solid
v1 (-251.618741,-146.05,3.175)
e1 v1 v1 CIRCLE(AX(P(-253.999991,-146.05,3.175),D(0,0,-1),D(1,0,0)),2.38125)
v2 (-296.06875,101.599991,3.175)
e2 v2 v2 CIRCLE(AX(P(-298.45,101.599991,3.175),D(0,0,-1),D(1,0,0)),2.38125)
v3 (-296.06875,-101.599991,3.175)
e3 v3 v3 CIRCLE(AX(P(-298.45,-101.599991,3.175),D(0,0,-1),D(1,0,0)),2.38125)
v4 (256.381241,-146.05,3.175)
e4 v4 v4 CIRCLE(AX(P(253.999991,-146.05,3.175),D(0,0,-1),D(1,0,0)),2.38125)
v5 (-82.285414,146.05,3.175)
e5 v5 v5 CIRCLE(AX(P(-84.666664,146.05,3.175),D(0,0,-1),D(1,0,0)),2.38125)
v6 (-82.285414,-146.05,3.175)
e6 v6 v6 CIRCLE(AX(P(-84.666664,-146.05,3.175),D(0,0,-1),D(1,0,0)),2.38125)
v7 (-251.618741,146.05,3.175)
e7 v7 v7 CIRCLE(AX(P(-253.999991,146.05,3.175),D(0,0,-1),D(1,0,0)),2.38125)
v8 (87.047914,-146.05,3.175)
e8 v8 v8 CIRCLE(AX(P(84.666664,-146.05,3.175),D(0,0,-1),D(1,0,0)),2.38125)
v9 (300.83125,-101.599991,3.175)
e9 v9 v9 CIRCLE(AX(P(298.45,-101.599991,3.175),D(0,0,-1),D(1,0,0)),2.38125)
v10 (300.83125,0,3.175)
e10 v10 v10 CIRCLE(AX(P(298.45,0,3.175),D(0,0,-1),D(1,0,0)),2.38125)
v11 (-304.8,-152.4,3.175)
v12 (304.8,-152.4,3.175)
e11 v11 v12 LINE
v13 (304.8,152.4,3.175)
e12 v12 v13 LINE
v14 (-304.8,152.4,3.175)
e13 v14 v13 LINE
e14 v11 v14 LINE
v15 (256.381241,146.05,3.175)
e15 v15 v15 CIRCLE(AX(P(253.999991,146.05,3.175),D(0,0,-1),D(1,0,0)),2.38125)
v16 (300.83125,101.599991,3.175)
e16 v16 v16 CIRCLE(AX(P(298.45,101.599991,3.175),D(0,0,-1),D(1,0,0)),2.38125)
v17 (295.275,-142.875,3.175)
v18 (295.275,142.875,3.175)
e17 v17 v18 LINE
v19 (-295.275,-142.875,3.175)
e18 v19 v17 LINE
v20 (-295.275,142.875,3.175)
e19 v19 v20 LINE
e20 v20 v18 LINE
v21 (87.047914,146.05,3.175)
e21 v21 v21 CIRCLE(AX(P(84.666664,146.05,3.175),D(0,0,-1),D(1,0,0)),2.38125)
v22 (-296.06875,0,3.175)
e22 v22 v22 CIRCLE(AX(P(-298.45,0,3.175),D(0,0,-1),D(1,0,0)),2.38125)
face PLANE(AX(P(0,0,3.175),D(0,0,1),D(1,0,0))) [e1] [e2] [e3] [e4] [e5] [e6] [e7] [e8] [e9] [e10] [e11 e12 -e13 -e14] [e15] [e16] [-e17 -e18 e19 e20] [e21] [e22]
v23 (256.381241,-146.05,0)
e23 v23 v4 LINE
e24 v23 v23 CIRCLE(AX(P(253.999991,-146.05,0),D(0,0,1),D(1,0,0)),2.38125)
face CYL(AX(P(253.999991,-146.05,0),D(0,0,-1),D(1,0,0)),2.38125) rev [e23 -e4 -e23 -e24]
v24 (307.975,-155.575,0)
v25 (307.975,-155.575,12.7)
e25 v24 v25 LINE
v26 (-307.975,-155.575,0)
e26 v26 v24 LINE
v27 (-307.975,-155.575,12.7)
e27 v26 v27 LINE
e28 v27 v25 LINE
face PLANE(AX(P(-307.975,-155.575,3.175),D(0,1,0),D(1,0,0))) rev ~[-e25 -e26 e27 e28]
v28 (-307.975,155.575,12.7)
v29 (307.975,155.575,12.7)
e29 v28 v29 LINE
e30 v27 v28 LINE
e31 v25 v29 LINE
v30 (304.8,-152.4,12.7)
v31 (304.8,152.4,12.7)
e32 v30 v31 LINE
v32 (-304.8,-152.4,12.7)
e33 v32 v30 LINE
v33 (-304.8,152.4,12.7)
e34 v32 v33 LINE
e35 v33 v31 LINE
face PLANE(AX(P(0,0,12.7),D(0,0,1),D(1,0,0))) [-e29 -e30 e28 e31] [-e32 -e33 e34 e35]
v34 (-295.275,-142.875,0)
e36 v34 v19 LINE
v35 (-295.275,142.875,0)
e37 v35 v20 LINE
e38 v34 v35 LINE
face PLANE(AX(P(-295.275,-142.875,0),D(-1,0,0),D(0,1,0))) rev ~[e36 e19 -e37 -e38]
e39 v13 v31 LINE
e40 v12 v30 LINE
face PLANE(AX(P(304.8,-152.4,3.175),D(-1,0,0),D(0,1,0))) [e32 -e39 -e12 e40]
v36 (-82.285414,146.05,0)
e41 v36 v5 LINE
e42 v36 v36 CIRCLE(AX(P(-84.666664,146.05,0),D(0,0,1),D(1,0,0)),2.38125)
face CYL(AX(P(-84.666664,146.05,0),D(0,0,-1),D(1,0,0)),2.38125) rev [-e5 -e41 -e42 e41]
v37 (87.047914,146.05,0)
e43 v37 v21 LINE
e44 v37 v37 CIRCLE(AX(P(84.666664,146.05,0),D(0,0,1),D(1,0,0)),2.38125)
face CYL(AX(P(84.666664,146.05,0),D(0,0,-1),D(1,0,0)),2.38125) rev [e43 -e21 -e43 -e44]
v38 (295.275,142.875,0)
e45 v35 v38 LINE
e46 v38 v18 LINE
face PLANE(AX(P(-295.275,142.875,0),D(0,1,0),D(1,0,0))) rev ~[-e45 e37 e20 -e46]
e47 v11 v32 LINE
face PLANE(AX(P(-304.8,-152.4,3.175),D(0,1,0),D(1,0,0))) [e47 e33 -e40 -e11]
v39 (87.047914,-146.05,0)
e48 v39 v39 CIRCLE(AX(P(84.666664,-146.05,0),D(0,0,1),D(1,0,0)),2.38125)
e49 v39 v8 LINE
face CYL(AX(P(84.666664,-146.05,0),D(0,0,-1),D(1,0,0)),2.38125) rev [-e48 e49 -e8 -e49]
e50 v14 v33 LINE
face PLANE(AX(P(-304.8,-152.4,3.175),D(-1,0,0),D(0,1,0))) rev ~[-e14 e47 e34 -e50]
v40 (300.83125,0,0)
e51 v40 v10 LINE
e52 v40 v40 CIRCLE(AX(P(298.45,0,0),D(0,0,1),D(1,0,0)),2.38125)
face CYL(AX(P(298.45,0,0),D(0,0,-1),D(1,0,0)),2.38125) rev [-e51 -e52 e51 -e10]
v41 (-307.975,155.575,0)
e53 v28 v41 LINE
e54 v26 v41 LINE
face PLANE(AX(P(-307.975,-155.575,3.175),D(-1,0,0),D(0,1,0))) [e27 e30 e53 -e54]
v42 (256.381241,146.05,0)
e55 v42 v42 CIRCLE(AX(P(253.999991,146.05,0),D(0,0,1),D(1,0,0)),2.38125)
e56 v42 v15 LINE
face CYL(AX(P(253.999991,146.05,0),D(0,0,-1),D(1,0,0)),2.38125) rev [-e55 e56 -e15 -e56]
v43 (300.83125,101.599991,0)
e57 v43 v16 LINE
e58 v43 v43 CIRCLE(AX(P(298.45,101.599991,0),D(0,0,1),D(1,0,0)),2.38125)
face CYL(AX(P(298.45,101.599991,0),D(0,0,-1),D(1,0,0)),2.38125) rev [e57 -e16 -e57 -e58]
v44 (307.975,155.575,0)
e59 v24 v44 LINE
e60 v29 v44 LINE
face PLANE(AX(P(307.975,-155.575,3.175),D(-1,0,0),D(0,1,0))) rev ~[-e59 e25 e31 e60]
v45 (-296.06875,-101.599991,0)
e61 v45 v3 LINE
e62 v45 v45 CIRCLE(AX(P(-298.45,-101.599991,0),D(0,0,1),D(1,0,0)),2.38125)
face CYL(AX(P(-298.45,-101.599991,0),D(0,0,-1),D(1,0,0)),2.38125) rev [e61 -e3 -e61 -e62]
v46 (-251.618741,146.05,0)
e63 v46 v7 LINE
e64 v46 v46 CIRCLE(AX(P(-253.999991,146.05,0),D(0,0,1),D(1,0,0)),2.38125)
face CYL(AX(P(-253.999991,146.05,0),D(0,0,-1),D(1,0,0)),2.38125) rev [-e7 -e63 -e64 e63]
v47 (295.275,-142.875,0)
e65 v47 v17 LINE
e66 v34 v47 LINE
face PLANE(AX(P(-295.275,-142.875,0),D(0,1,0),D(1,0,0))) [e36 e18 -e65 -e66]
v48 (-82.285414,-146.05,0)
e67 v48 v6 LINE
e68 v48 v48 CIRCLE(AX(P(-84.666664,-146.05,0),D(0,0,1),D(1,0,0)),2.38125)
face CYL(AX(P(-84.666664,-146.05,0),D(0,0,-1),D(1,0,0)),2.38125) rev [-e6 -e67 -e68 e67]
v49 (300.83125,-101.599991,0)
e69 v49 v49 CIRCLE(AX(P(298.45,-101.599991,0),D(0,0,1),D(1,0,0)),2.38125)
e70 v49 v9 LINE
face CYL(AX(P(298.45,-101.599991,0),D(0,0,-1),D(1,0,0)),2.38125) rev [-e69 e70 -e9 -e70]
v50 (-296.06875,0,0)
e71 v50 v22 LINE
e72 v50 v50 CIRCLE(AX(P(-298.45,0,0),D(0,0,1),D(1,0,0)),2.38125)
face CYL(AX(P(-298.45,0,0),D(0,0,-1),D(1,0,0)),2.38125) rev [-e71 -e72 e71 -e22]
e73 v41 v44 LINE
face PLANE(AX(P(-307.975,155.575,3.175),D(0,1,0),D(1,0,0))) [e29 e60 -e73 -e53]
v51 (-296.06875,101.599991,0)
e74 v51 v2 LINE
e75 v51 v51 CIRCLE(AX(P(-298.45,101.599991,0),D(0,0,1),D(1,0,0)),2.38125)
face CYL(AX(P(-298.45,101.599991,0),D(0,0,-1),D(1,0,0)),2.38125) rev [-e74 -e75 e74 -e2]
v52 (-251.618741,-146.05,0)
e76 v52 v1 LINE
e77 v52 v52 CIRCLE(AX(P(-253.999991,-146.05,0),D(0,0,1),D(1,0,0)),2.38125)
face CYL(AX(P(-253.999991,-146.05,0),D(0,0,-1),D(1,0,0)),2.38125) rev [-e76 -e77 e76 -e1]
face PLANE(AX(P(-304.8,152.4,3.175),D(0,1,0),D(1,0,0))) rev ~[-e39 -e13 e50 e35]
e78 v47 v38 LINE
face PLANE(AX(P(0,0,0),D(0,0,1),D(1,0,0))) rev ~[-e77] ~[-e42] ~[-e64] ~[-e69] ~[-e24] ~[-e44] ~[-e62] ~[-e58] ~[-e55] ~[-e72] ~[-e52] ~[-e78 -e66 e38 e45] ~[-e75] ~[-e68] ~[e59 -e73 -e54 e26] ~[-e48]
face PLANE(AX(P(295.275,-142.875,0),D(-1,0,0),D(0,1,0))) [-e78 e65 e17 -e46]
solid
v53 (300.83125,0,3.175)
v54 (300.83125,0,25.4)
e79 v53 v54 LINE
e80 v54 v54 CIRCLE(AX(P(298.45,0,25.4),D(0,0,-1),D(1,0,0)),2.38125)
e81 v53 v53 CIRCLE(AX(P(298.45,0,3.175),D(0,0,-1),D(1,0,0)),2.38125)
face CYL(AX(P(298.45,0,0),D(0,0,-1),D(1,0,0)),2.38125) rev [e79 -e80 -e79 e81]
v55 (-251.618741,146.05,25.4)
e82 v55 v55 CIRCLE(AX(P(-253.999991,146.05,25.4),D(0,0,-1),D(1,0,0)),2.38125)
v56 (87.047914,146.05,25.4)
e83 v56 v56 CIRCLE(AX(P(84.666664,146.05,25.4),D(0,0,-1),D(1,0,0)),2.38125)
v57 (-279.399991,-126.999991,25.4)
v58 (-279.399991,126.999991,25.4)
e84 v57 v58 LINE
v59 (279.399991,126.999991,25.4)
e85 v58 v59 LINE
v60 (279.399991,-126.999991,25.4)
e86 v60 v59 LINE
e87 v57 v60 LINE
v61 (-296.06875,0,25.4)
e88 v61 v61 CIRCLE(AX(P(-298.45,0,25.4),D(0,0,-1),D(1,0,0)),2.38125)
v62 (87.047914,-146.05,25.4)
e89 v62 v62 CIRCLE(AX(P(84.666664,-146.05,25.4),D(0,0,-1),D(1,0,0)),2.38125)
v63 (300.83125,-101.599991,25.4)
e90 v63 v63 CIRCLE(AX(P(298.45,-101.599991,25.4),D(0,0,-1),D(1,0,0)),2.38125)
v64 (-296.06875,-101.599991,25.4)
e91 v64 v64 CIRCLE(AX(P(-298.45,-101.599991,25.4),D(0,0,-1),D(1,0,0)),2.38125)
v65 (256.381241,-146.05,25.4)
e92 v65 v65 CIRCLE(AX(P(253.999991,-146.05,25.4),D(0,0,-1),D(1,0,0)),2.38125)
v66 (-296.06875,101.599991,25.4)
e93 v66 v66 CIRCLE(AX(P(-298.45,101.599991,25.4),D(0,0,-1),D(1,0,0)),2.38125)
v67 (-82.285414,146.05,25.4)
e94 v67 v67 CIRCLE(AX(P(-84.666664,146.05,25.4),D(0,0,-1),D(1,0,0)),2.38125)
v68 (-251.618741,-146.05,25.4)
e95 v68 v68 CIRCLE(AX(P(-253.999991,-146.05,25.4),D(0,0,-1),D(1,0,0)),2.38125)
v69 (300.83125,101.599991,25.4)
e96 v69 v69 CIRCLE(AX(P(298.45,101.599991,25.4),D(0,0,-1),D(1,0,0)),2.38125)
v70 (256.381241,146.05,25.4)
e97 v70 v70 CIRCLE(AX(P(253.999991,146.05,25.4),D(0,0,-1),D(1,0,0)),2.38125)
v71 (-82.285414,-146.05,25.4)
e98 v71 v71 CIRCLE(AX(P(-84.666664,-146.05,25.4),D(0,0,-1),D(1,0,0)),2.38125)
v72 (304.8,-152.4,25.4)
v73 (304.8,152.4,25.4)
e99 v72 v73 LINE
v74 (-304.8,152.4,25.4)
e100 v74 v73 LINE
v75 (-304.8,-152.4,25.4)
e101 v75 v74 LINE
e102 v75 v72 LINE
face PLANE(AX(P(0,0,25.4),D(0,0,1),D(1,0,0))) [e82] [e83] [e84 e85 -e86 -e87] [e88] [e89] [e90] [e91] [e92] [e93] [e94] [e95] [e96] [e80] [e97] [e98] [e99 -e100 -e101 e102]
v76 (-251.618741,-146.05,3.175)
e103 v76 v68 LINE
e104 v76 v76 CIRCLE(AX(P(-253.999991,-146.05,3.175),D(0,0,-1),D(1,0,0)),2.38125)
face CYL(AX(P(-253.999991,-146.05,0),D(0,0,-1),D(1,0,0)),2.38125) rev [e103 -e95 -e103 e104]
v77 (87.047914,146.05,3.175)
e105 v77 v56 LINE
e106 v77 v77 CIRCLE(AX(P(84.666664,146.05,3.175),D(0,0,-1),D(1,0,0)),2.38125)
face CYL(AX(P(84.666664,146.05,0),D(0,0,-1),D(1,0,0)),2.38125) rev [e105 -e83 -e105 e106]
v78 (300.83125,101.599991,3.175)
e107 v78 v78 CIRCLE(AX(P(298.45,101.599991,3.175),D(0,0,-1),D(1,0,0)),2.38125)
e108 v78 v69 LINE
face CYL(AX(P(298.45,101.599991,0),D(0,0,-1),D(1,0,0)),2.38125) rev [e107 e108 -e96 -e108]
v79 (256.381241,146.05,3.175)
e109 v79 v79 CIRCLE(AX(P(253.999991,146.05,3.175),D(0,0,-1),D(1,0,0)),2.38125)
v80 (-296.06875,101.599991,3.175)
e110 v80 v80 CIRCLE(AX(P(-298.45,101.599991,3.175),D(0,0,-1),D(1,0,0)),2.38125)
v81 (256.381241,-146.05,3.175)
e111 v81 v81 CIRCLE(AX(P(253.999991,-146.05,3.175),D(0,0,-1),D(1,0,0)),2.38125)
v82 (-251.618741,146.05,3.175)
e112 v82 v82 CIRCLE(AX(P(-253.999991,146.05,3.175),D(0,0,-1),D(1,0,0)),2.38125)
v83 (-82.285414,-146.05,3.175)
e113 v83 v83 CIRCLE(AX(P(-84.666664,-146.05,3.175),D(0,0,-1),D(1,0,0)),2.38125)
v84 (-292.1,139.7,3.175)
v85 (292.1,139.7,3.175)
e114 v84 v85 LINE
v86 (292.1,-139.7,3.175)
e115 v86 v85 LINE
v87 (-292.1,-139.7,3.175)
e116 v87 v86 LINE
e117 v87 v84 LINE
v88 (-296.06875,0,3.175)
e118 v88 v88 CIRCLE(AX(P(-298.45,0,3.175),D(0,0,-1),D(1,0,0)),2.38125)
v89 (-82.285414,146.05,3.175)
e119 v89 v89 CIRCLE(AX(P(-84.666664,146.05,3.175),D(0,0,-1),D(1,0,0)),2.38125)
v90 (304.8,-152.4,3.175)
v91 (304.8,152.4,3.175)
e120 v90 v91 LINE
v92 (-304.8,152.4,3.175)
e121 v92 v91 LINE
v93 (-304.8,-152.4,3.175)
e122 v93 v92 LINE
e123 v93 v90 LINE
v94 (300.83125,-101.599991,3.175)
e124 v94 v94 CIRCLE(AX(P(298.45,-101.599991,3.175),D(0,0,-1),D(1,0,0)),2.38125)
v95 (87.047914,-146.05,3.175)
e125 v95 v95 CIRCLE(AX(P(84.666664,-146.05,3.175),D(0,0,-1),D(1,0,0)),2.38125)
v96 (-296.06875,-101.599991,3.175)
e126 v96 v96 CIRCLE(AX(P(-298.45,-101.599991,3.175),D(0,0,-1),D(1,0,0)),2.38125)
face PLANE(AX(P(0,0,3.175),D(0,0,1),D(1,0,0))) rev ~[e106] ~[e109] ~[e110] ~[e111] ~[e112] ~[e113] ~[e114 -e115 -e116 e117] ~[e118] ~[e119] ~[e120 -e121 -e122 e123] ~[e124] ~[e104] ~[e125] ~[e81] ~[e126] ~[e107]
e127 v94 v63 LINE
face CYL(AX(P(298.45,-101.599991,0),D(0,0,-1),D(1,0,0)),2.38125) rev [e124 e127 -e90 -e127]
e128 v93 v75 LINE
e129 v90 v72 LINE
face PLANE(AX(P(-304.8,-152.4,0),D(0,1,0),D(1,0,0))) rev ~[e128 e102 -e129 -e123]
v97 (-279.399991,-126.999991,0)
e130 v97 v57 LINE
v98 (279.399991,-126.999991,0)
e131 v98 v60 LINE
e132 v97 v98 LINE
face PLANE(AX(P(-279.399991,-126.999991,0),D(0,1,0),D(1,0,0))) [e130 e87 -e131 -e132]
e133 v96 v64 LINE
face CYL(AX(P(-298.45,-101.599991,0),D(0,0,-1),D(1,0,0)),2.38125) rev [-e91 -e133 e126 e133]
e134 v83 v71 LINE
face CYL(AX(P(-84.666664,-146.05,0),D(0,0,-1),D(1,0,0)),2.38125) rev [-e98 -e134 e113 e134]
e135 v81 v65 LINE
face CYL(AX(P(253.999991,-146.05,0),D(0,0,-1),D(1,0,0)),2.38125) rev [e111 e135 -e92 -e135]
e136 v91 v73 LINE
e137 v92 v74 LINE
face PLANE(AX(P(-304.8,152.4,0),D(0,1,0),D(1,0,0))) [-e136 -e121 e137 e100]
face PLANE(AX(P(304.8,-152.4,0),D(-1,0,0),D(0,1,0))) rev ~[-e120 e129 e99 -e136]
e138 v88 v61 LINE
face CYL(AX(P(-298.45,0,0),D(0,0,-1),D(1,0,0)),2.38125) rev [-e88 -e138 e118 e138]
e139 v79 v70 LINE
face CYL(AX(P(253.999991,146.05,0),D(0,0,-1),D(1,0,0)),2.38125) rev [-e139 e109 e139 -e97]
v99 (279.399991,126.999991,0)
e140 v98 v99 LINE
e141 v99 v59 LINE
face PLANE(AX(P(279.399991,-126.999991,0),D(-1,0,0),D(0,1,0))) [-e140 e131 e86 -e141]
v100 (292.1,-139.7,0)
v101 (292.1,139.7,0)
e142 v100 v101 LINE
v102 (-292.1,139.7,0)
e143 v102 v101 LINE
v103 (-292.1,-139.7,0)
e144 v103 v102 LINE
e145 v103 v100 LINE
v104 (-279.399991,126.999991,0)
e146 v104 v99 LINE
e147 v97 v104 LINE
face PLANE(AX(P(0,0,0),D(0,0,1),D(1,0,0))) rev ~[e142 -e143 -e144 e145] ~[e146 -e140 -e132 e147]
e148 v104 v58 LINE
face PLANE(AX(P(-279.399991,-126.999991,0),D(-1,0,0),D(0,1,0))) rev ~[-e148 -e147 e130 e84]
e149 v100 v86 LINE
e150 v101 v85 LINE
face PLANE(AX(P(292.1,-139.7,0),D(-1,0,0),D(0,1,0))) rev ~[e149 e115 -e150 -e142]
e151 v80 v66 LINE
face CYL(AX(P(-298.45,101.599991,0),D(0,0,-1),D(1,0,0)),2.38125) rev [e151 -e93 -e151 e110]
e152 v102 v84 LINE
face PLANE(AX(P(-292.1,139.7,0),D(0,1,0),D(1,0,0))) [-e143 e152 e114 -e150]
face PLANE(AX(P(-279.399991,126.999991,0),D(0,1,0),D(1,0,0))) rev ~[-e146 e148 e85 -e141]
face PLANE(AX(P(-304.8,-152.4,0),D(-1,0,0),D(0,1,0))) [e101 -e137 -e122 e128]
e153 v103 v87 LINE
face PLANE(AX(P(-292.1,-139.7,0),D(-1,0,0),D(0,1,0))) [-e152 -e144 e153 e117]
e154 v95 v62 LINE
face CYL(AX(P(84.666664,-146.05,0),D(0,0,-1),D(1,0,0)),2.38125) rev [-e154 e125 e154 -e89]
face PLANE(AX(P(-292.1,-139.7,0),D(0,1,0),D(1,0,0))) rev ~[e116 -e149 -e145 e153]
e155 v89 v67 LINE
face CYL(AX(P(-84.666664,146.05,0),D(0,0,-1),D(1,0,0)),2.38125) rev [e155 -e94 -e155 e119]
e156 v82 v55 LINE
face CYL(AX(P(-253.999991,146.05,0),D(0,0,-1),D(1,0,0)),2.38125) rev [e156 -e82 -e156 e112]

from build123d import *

# Parameters (mm, degrees)
F0_W     = 609.6
F0_H     = 304.8
F0_W_2   = 558.7999820709
F0_H_2   = 253.9999820709
F1_DEPTH = 25.4
F2_W     = 609.6
F2_H     = 304.8
F2_W_2   = 584.2
F2_H_2   = 279.4
F3_DEPTH = 3.175
F4_W     = 615.95
F4_H     = 311.15
F4_W_2   = 590.55
F4_H_2   = 285.75
F5_DEPTH = 3.175
F6_W     = 615.95
F6_H     = 311.15
F6_W_2   = 609.6
F6_H_2   = 304.8
F7_DEPTH = 9.525
F8_R     = 2.38125
F9_DEPTH = 25.401


with BuildPart() as f1:
    # F0 (on Top) → F1 (new body)
    with BuildSketch(Plane.XY):
        Rectangle(F0_W, F0_H)
        Rectangle(F0_W_2, F0_H_2, mode=Mode.SUBTRACT)
    extrude(amount=F1_DEPTH)

    # F2 (on Top) → F3 (cut)
    with BuildSketch(Plane.XY):
        Rectangle(F2_W, F2_H)
        Rectangle(F2_W_2, F2_H_2, mode=Mode.SUBTRACT)
    extrude(amount=F3_DEPTH, mode=Mode.SUBTRACT)


with BuildPart() as f5:
    # F4 (on Top) → F5 (new body)
    with BuildSketch(Plane.XY):
        Rectangle(F4_W, F4_H)
        Rectangle(F4_W_2, F4_H_2, mode=Mode.SUBTRACT)
    extrude(amount=F5_DEPTH)

    # F6 (on face) → F7 (join)
    with BuildSketch(Plane.XY.offset(3.175)):
        Rectangle(F6_W, F6_H)
        Rectangle(F6_W_2, F6_H_2, mode=Mode.SUBTRACT)
    extrude(amount=F7_DEPTH)


with BuildPart() as f9_tool:
    # F8 (on Top) → F9 (new body, through all)
    with BuildSketch(Plane.XY):
        with Locations((-253.9999910355, 146.05)):
            Circle(F8_R)
        with Locations((-84.6666636785, 146.05)):
            Circle(F8_R)
        with Locations((84.6666636785, 146.05)):
            Circle(F8_R)
        with Locations((253.9999910355, 146.05)):
            Circle(F8_R)
        with Locations((298.45, 101.5999910355)):
            Circle(F8_R)
        with Locations((298.45, 0)):
            Circle(F8_R)
        with Locations((298.45, -101.5999910355)):
            Circle(F8_R)
        with Locations((253.9999910355, -146.05)):
            Circle(F8_R)
        with Locations((84.6666636785, -146.05)):
            Circle(F8_R)
        with Locations((-84.6666636785, -146.05)):
            Circle(F8_R)
        with Locations((-253.9999910355, -146.05)):
            Circle(F8_R)
        with Locations((-298.45, 101.5999910355)):
            Circle(F8_R)
        with Locations((-298.45, 0)):
            Circle(F8_R)
        with Locations((-298.45, -101.5999910355)):
            Circle(F8_R)
    extrude(amount=F9_DEPTH)


with BuildPart() as f1_1:
    add(f1.part)

    # F9: cut by f9_tool
    add(f9_tool.part, mode=Mode.SUBTRACT)


with BuildPart() as f5_1:
    add(f5.part)

    # F9: cut by f9_tool
    add(f9_tool.part, mode=Mode.SUBTRACT)


solid = Compound([f1_1.part, f5_1.part])
